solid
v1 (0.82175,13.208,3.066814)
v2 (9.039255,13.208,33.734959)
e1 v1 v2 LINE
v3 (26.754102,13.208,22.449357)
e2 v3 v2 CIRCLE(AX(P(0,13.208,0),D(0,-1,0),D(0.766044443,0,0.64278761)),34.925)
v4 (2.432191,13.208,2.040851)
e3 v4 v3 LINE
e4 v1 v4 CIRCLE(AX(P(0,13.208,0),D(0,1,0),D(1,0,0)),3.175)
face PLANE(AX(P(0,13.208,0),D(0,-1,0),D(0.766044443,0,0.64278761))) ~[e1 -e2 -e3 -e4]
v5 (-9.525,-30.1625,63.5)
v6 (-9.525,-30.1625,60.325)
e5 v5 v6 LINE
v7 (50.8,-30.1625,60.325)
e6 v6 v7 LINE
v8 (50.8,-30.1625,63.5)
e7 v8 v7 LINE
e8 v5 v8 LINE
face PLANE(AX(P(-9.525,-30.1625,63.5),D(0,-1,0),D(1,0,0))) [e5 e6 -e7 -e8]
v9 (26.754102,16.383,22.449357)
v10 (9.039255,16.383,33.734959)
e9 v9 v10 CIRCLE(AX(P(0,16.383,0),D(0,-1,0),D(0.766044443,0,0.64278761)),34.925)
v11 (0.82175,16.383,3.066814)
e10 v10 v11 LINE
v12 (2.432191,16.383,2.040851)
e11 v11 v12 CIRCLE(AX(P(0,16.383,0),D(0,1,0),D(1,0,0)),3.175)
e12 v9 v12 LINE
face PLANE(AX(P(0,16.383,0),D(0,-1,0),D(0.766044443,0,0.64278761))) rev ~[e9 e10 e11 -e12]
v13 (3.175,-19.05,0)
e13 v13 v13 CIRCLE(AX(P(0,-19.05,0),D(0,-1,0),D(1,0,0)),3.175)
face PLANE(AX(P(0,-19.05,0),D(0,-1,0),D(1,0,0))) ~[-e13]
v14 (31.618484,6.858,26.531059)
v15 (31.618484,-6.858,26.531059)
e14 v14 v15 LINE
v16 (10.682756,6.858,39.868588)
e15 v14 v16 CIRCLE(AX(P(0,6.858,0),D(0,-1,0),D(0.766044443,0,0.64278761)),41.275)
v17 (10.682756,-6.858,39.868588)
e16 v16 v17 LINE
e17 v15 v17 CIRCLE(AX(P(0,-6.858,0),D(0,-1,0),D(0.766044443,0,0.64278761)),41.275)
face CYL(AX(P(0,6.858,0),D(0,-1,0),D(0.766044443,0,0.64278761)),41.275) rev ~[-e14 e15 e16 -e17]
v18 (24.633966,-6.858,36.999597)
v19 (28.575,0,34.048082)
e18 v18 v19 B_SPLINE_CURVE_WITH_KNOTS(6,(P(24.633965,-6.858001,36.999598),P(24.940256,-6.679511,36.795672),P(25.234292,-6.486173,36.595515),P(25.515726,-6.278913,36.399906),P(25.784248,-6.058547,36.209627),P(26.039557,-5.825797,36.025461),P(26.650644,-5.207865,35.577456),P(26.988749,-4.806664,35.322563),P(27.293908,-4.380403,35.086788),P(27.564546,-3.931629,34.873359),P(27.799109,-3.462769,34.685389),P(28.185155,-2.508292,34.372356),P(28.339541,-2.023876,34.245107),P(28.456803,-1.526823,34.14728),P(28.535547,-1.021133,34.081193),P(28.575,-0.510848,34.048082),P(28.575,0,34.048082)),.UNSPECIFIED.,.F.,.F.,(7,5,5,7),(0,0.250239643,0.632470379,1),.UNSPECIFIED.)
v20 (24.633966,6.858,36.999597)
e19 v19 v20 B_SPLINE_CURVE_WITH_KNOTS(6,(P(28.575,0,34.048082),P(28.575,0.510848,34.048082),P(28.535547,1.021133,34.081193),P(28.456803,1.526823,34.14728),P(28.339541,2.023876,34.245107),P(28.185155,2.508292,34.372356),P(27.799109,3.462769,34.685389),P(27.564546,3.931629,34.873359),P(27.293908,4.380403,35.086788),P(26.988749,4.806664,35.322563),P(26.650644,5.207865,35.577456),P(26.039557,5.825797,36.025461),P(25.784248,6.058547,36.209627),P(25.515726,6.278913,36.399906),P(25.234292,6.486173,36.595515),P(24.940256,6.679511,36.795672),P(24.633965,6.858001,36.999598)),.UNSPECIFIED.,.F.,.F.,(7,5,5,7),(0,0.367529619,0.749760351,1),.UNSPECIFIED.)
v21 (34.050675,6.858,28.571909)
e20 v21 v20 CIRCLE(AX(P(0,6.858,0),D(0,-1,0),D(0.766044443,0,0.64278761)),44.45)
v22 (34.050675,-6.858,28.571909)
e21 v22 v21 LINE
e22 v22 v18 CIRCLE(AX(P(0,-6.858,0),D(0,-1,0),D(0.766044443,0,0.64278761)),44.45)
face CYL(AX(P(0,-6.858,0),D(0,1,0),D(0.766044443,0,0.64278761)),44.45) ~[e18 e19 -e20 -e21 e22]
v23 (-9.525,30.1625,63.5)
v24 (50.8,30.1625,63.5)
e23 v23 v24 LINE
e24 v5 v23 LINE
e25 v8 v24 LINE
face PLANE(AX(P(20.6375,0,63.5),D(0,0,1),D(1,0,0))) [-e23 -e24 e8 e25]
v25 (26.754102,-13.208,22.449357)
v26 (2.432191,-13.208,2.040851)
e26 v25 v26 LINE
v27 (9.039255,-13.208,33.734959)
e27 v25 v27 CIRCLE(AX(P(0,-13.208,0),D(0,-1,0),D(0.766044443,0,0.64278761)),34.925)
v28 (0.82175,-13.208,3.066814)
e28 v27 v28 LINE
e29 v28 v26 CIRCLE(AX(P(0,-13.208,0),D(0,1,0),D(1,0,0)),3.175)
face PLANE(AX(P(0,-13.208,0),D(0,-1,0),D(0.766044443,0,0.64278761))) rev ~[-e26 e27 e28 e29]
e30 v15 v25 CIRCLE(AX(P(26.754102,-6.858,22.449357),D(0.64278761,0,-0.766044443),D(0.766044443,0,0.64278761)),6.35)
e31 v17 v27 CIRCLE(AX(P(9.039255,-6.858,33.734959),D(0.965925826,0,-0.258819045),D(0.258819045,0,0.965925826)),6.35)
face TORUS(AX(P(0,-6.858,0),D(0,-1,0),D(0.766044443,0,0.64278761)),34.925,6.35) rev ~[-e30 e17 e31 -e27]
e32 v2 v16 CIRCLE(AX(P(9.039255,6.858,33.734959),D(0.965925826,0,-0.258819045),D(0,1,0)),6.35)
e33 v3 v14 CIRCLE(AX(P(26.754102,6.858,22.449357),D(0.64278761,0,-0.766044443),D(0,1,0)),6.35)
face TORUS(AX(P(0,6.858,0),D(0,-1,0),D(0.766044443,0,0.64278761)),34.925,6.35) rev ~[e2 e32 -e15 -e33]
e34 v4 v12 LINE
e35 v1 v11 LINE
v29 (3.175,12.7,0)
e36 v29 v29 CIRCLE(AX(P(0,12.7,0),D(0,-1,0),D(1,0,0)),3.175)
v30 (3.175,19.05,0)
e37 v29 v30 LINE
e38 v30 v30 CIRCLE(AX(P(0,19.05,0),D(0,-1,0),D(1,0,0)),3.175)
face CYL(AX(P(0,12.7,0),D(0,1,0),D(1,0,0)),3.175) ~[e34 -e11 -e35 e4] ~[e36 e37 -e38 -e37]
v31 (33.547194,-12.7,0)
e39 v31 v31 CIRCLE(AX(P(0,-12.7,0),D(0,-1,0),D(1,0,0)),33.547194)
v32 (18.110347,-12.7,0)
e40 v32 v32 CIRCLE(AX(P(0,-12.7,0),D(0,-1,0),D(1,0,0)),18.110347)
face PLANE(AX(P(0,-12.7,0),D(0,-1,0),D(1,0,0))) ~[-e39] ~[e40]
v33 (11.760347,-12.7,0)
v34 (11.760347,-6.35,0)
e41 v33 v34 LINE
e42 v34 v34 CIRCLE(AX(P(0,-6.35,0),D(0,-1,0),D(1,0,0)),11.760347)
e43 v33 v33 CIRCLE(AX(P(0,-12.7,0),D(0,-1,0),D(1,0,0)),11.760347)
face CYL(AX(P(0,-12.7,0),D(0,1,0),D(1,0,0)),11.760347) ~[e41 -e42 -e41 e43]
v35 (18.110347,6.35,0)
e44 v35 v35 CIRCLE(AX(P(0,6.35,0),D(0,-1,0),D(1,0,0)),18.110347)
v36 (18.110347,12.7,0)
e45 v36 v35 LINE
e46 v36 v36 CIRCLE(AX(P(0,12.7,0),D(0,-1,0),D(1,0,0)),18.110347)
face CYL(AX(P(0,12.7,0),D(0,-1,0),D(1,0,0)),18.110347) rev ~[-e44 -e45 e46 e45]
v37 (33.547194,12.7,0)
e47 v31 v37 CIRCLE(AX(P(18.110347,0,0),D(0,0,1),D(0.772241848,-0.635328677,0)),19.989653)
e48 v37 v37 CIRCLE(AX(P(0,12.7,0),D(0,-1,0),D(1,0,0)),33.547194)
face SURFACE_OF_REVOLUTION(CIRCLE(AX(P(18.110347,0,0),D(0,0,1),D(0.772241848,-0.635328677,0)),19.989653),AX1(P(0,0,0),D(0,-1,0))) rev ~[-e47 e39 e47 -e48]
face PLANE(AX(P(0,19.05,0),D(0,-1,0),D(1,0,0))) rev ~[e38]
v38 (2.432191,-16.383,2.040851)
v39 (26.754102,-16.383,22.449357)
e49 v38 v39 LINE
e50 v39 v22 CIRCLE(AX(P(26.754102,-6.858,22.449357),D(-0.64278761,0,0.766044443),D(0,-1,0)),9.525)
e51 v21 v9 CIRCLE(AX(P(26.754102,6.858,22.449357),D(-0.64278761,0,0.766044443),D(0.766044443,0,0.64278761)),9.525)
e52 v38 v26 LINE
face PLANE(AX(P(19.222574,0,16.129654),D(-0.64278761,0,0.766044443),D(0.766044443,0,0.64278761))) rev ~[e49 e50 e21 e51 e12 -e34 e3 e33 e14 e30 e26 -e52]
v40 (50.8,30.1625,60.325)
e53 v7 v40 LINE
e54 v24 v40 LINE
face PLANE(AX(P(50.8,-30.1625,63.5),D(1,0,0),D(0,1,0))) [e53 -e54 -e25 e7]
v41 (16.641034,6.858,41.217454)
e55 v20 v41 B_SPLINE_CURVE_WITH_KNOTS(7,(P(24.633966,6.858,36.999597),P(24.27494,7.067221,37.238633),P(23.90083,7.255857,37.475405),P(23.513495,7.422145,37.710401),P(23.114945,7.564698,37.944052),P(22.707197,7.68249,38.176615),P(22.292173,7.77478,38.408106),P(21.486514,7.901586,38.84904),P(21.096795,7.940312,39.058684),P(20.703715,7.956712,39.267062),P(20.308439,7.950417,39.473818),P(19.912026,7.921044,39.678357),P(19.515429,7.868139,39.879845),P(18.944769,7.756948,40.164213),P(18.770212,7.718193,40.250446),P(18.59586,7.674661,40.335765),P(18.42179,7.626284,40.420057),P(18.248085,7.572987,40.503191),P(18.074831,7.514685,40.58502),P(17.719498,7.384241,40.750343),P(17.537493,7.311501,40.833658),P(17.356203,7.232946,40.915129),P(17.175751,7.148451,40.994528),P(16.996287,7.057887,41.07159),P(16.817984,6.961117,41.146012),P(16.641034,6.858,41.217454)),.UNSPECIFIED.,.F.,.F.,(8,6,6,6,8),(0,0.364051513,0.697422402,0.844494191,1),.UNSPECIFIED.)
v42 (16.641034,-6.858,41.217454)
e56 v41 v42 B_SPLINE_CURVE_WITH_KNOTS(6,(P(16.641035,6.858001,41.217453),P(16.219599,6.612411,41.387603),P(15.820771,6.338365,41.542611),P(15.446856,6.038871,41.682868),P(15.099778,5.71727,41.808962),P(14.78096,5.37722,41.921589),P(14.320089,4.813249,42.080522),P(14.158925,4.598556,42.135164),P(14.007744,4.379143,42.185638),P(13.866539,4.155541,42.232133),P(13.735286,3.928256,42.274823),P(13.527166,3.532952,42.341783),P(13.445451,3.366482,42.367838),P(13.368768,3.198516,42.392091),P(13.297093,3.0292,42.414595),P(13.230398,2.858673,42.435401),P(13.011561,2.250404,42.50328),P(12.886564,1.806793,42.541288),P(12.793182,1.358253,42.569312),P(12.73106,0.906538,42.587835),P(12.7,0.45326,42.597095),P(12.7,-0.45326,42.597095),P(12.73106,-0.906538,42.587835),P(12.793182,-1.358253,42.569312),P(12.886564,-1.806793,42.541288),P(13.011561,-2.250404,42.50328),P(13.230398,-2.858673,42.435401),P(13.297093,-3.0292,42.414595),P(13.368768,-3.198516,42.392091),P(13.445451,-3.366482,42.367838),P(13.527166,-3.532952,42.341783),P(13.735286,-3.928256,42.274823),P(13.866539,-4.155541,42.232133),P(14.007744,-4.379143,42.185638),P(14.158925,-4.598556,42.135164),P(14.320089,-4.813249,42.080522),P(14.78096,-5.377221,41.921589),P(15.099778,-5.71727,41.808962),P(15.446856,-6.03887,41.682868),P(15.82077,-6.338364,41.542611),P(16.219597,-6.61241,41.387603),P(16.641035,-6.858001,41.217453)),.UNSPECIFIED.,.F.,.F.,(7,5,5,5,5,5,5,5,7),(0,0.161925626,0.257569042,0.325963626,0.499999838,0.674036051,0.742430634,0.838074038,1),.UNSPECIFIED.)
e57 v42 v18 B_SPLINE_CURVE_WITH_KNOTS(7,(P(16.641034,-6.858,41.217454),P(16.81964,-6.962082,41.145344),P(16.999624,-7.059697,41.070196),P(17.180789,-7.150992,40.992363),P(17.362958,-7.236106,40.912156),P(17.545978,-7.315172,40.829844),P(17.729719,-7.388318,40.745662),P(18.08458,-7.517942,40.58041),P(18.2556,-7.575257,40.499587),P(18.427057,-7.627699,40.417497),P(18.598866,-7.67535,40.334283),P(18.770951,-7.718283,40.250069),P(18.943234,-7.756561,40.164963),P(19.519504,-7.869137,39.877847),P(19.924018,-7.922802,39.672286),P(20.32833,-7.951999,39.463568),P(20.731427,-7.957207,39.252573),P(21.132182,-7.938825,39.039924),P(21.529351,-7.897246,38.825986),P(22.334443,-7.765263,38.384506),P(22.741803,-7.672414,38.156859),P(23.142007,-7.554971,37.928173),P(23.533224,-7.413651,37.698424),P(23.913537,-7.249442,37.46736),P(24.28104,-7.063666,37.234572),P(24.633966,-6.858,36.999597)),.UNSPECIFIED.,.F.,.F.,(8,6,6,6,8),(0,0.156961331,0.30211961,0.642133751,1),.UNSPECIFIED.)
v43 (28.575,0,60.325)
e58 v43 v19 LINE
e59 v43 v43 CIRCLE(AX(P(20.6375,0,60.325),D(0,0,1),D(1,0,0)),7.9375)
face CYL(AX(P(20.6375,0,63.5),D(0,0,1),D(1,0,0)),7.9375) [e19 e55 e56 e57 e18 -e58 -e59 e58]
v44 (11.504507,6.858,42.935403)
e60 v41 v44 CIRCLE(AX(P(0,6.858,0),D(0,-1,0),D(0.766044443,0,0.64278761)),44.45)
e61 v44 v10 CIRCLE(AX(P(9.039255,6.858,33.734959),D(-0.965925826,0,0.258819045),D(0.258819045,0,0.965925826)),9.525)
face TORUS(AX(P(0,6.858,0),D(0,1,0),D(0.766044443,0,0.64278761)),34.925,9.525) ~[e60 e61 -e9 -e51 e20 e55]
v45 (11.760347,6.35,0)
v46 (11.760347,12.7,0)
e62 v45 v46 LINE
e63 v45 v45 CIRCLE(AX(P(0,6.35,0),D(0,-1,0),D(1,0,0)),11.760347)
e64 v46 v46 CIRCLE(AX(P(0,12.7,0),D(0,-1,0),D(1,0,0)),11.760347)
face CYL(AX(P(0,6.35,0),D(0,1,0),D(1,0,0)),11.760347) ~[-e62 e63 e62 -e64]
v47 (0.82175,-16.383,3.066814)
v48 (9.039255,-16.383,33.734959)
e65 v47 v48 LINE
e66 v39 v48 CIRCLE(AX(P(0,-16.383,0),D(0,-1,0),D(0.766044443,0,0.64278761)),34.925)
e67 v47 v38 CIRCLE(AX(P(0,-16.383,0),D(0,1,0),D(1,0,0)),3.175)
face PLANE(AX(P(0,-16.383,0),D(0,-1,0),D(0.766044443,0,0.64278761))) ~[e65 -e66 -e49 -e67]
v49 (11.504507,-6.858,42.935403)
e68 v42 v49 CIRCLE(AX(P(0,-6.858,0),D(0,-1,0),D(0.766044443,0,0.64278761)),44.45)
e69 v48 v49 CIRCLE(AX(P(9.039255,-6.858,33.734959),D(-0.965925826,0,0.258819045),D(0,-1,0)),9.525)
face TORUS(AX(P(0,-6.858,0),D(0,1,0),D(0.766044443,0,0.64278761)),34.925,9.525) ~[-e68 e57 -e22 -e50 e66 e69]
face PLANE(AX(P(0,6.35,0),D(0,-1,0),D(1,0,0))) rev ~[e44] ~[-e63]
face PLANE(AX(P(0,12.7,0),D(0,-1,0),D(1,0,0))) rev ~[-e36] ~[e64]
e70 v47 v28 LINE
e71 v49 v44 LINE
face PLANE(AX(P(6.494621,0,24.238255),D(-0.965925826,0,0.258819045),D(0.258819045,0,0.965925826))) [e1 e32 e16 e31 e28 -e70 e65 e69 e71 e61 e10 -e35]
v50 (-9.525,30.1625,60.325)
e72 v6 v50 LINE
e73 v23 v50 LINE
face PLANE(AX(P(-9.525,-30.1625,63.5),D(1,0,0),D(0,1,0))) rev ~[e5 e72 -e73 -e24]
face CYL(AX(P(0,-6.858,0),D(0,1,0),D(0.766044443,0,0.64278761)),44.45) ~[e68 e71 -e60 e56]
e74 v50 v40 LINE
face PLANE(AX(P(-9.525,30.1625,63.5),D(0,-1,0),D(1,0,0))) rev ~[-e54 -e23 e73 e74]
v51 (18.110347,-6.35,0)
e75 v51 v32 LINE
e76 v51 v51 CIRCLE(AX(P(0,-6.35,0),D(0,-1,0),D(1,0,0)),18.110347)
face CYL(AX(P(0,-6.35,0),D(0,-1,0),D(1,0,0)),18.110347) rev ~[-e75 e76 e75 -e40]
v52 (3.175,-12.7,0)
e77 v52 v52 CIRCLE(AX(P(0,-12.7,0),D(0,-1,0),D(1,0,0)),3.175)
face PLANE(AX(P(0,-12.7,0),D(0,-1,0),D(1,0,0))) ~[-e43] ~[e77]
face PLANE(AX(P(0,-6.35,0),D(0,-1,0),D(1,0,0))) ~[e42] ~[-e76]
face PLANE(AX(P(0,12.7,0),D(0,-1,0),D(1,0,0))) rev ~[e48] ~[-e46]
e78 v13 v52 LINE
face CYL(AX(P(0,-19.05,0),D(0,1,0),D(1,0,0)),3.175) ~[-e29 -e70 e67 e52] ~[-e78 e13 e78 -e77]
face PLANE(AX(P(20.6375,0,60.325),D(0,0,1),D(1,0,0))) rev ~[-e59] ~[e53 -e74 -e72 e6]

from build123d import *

# Parameters (mm, degrees)
F3_ANGLE_START = 40
F3_ANGLE       = 35
F6_R           = 7.9375
F5_W           = 60.325
F5_H           = 60.325
F8_DEPTH       = 3.175


with BuildPart() as f1:
    # F0 (on Top) → F1 (revolve)
    with BuildSketch(Plane.XY):
        with BuildLine():
            Line((3.175, -19.05), (3.175, -12.7))
            Line((3.175, -12.7), (11.7603466757, -12.7))
            Line((11.7603466757, -12.7), (11.7603466757, -6.35))
            Line((11.7603466757, -6.35), (18.1103466757, -6.35))
            Line((18.1103466757, -6.35), (18.1103466757, -12.7))
            Line((18.1103466757, -12.7), (33.5471935048, -12.7))
            ThreePointArc((33.5471935048, -12.7), (38.1, 0), (33.5471935048, 12.7))
            Line((33.5471935048, 12.7), (18.1103466757, 12.7))
            Line((18.1103466757, 12.7), (18.1103466757, 6.35))
            Line((18.1103466757, 6.35), (11.7603466757, 6.35))
            Line((11.7603466757, 6.35), (11.7603466757, 12.7))
            Line((11.7603466757, 12.7), (3.175, 12.7))
            Line((3.175, 12.7), (3.175, 19.05))
            Line((3.175, 19.05), (0, 19.05))
            Line((0, 19.05), (0, -19.05))
            Line((0, -19.05), (3.175, -19.05))
        make_face()
    revolve(axis=Axis((0, 0, 0), (0, -1, 0)))

    # F2 (on Top) → F3 (revolve)
    with BuildSketch(Plane.XY, mode=Mode.PRIVATE) as f3_sk:
        with BuildLine():
            Line((0, 16.383), (0, 13.208))
            Line((0, 13.208), (34.925, 13.208))
            ThreePointArc((34.925, 13.208), (39.4151280605, 11.3481280605), (41.275, 6.858))
            Line((41.275, 6.858), (41.275, 0))
            Line((41.275, 0), (41.275, -6.858))
            ThreePointArc((41.275, -6.858), (39.4151280605, -11.3481280605), (34.925, -13.208))
            Line((34.925, -13.208), (0, -13.208))
            Line((0, -13.208), (0, -16.383))
            Line((0, -16.383), (34.925, -16.383))
            ThreePointArc((34.925, -16.383), (41.6601920908, -13.5931920908), (44.45, -6.858))
            Line((44.45, -6.858), (44.45, 0))
            Line((44.45, 0), (44.45, 6.858))
            ThreePointArc((44.45, 6.858), (41.6601920908, 13.5931920908), (34.925, 16.383))
            Line((34.925, 16.383), (0, 16.383))
        make_face()
    revolve(f3_sk.sketch.rotate(Axis((0, 23.489471525, 0), (0, -1, 0)), F3_ANGLE_START), axis=Axis((0, 23.489471525, 0), (0, -1, 0)), revolution_arc=F3_ANGLE)

    # F6 (on offset) → F7 (join, up to the next surface of F1)
    with BuildSketch(Plane.XY.offset(63.5)):
        with Locations((20.6375, 0)):
            Circle(F6_R)
    extrude(until=Until.NEXT, dir=(0, 0, -1))

    # F5 (on offset) → F8 (join)
    with BuildSketch(Plane.XY.offset(63.5)):
        with Locations((20.6375, 0)):
            Rectangle(F5_W, F5_H)
    extrude(amount=-F8_DEPTH)


solid = f1.part
